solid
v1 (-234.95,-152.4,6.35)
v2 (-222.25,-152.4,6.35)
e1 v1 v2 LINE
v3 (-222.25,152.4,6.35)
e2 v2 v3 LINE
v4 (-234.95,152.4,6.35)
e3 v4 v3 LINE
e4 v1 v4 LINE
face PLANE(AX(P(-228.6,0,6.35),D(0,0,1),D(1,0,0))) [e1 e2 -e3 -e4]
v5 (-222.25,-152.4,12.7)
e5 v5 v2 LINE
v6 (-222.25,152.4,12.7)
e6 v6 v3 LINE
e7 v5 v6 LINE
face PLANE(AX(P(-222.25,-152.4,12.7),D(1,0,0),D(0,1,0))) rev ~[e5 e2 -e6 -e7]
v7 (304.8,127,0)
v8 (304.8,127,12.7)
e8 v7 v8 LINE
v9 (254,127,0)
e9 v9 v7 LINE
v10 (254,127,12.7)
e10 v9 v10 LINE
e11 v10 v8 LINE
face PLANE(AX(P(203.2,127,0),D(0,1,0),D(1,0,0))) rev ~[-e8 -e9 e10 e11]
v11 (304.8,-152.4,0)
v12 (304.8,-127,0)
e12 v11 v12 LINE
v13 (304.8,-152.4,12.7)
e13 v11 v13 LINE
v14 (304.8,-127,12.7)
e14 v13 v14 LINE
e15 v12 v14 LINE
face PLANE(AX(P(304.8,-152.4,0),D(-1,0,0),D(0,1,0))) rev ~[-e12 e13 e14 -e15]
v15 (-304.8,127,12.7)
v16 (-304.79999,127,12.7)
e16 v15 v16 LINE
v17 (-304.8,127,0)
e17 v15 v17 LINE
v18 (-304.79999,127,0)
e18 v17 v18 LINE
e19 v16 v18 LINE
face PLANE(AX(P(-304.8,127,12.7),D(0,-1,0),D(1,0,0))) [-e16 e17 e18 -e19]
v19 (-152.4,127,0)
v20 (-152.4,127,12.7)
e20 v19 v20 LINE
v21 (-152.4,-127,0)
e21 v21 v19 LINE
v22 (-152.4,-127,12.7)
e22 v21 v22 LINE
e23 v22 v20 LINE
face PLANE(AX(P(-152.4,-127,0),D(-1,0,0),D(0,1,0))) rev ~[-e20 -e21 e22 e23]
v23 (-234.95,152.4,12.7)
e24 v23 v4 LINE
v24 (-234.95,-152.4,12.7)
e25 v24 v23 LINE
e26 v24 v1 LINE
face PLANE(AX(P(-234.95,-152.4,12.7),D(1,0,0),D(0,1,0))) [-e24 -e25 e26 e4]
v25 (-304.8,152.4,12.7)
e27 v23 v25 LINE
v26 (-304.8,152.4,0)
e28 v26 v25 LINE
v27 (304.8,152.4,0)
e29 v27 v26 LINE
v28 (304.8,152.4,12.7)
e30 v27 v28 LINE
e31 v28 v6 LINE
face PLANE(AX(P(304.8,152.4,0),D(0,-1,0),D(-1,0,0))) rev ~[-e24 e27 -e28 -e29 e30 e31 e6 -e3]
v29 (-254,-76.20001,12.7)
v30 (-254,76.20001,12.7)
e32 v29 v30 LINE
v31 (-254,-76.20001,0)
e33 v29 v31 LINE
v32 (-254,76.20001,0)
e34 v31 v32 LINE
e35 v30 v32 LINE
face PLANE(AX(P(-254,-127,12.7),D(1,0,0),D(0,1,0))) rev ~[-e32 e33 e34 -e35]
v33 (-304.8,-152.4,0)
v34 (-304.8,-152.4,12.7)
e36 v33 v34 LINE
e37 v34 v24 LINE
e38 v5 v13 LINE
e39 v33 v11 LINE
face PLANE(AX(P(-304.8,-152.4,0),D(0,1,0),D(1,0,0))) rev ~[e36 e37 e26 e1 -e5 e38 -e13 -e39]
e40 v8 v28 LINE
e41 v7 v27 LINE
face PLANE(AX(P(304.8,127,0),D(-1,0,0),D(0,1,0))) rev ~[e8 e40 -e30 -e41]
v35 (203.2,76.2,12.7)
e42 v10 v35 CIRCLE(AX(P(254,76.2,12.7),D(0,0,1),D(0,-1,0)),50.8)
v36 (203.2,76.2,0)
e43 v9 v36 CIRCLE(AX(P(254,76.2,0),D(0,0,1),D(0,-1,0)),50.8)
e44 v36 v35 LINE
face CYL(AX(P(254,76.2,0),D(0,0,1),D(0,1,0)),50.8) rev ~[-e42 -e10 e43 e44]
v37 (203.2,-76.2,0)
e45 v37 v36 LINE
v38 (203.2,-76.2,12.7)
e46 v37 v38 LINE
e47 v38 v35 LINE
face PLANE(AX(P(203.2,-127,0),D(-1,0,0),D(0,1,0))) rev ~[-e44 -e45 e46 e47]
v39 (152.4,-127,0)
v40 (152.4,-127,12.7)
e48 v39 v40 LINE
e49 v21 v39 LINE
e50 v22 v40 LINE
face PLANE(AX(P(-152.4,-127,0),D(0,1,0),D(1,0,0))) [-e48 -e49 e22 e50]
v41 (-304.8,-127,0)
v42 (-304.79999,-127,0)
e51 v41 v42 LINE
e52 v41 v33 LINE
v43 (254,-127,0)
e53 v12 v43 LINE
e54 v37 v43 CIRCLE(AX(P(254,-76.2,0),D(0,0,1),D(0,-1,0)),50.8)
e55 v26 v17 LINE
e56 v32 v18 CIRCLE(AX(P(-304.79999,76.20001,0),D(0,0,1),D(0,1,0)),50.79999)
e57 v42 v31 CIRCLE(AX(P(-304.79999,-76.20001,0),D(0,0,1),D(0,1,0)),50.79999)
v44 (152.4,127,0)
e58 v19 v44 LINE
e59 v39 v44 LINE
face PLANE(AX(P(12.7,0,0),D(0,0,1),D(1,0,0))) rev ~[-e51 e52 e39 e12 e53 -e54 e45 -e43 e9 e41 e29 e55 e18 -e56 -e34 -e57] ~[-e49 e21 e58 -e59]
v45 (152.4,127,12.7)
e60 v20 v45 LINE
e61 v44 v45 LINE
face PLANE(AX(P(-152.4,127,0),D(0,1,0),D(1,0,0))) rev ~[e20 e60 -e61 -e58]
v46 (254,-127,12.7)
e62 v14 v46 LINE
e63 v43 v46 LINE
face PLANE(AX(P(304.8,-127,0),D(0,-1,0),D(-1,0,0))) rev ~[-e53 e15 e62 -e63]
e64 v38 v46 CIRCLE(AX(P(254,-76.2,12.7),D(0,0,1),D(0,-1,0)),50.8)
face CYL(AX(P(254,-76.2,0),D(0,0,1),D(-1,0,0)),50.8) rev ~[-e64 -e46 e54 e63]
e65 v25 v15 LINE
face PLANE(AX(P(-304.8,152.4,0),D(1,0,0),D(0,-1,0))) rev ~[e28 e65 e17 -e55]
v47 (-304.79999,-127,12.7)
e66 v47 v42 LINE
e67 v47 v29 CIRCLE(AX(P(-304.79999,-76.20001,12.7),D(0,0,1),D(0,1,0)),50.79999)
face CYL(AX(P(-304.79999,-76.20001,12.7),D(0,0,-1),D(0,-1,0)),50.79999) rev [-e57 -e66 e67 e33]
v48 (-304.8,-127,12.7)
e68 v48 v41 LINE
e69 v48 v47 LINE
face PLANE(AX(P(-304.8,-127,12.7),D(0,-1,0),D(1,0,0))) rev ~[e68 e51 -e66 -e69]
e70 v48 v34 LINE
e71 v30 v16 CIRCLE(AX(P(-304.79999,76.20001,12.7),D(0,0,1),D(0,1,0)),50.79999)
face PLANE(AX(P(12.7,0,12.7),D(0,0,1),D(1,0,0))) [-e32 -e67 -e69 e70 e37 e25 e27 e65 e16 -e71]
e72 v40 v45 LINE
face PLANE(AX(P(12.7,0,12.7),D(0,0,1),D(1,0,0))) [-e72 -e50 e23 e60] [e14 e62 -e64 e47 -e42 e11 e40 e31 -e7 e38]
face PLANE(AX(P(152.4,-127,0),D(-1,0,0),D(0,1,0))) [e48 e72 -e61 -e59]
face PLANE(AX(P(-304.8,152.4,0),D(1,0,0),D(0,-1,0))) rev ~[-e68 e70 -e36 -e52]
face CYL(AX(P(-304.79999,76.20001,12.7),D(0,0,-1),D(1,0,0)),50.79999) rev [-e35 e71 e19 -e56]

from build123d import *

# Parameters (mm, degrees)
F0_W     = 304.8
F0_H     = 254
F1_DEPTH = 12.7
F2_W     = 12.7
F2_H     = 304.8
F3_DEPTH = 6.35
F4_R     = 50.8
F5_W     = 50.8
F5_H     = 254
F6_DEPTH = 12.7
F7_R     = 50.79999


# Not quite as in the source:
# - a fillet or chamfer is up to 0.001 mm smaller than in the source, because OpenCascade refuses the exact size
# - a feature of the source that left no trace in its solid (it failed there, or was rolled back) is left out


with BuildPart() as f1:
    # F0 (on Top) → F1 (new body)
    with BuildSketch(Plane.XY):
        Polygon((304.8, 127), (304.8, 152.4), (-304.8, 152.4), (-304.8, -152.4), (304.8, -152.4), (304.8, -127), (203.2, -127), (203.2, 127), align=None)
        Rectangle(F0_W, F0_H, mode=Mode.SUBTRACT)
    extrude(amount=F1_DEPTH)

    # F2 (on face) → F3 (cut)
    with BuildSketch(Plane.XY.offset(12.7)):
        with Locations((-228.6, 0)):
            Rectangle(F2_W, F2_H)
    extrude(amount=-F3_DEPTH, mode=Mode.SUBTRACT)

    # F4
    f4_edges = [f1.edges().sort_by_distance(p)[0] for p in [
        (203.2, -127, 6.35),
        (203.2, 127, 6.35),
    ]]
    fillet(f4_edges, radius=F4_R)

    # F5 (on face) → F6 (cut)
    with BuildSketch(Plane.XY.offset(12.7)):
        with Locations((-279.4, 0)):
            Rectangle(F5_W, F5_H)
    extrude(amount=-F6_DEPTH, mode=Mode.SUBTRACT)

    # F7 (radius 50.8 in the source; OpenCascade refuses exactly that, so slightly less here)
    f7_edges = [f1.edges().sort_by_distance(p)[0] for p in [
        (-254, 127, 6.35),
        (-254, -127, 6.35),
    ]]
    fillet(f7_edges, radius=F7_R)


solid = f1.part
